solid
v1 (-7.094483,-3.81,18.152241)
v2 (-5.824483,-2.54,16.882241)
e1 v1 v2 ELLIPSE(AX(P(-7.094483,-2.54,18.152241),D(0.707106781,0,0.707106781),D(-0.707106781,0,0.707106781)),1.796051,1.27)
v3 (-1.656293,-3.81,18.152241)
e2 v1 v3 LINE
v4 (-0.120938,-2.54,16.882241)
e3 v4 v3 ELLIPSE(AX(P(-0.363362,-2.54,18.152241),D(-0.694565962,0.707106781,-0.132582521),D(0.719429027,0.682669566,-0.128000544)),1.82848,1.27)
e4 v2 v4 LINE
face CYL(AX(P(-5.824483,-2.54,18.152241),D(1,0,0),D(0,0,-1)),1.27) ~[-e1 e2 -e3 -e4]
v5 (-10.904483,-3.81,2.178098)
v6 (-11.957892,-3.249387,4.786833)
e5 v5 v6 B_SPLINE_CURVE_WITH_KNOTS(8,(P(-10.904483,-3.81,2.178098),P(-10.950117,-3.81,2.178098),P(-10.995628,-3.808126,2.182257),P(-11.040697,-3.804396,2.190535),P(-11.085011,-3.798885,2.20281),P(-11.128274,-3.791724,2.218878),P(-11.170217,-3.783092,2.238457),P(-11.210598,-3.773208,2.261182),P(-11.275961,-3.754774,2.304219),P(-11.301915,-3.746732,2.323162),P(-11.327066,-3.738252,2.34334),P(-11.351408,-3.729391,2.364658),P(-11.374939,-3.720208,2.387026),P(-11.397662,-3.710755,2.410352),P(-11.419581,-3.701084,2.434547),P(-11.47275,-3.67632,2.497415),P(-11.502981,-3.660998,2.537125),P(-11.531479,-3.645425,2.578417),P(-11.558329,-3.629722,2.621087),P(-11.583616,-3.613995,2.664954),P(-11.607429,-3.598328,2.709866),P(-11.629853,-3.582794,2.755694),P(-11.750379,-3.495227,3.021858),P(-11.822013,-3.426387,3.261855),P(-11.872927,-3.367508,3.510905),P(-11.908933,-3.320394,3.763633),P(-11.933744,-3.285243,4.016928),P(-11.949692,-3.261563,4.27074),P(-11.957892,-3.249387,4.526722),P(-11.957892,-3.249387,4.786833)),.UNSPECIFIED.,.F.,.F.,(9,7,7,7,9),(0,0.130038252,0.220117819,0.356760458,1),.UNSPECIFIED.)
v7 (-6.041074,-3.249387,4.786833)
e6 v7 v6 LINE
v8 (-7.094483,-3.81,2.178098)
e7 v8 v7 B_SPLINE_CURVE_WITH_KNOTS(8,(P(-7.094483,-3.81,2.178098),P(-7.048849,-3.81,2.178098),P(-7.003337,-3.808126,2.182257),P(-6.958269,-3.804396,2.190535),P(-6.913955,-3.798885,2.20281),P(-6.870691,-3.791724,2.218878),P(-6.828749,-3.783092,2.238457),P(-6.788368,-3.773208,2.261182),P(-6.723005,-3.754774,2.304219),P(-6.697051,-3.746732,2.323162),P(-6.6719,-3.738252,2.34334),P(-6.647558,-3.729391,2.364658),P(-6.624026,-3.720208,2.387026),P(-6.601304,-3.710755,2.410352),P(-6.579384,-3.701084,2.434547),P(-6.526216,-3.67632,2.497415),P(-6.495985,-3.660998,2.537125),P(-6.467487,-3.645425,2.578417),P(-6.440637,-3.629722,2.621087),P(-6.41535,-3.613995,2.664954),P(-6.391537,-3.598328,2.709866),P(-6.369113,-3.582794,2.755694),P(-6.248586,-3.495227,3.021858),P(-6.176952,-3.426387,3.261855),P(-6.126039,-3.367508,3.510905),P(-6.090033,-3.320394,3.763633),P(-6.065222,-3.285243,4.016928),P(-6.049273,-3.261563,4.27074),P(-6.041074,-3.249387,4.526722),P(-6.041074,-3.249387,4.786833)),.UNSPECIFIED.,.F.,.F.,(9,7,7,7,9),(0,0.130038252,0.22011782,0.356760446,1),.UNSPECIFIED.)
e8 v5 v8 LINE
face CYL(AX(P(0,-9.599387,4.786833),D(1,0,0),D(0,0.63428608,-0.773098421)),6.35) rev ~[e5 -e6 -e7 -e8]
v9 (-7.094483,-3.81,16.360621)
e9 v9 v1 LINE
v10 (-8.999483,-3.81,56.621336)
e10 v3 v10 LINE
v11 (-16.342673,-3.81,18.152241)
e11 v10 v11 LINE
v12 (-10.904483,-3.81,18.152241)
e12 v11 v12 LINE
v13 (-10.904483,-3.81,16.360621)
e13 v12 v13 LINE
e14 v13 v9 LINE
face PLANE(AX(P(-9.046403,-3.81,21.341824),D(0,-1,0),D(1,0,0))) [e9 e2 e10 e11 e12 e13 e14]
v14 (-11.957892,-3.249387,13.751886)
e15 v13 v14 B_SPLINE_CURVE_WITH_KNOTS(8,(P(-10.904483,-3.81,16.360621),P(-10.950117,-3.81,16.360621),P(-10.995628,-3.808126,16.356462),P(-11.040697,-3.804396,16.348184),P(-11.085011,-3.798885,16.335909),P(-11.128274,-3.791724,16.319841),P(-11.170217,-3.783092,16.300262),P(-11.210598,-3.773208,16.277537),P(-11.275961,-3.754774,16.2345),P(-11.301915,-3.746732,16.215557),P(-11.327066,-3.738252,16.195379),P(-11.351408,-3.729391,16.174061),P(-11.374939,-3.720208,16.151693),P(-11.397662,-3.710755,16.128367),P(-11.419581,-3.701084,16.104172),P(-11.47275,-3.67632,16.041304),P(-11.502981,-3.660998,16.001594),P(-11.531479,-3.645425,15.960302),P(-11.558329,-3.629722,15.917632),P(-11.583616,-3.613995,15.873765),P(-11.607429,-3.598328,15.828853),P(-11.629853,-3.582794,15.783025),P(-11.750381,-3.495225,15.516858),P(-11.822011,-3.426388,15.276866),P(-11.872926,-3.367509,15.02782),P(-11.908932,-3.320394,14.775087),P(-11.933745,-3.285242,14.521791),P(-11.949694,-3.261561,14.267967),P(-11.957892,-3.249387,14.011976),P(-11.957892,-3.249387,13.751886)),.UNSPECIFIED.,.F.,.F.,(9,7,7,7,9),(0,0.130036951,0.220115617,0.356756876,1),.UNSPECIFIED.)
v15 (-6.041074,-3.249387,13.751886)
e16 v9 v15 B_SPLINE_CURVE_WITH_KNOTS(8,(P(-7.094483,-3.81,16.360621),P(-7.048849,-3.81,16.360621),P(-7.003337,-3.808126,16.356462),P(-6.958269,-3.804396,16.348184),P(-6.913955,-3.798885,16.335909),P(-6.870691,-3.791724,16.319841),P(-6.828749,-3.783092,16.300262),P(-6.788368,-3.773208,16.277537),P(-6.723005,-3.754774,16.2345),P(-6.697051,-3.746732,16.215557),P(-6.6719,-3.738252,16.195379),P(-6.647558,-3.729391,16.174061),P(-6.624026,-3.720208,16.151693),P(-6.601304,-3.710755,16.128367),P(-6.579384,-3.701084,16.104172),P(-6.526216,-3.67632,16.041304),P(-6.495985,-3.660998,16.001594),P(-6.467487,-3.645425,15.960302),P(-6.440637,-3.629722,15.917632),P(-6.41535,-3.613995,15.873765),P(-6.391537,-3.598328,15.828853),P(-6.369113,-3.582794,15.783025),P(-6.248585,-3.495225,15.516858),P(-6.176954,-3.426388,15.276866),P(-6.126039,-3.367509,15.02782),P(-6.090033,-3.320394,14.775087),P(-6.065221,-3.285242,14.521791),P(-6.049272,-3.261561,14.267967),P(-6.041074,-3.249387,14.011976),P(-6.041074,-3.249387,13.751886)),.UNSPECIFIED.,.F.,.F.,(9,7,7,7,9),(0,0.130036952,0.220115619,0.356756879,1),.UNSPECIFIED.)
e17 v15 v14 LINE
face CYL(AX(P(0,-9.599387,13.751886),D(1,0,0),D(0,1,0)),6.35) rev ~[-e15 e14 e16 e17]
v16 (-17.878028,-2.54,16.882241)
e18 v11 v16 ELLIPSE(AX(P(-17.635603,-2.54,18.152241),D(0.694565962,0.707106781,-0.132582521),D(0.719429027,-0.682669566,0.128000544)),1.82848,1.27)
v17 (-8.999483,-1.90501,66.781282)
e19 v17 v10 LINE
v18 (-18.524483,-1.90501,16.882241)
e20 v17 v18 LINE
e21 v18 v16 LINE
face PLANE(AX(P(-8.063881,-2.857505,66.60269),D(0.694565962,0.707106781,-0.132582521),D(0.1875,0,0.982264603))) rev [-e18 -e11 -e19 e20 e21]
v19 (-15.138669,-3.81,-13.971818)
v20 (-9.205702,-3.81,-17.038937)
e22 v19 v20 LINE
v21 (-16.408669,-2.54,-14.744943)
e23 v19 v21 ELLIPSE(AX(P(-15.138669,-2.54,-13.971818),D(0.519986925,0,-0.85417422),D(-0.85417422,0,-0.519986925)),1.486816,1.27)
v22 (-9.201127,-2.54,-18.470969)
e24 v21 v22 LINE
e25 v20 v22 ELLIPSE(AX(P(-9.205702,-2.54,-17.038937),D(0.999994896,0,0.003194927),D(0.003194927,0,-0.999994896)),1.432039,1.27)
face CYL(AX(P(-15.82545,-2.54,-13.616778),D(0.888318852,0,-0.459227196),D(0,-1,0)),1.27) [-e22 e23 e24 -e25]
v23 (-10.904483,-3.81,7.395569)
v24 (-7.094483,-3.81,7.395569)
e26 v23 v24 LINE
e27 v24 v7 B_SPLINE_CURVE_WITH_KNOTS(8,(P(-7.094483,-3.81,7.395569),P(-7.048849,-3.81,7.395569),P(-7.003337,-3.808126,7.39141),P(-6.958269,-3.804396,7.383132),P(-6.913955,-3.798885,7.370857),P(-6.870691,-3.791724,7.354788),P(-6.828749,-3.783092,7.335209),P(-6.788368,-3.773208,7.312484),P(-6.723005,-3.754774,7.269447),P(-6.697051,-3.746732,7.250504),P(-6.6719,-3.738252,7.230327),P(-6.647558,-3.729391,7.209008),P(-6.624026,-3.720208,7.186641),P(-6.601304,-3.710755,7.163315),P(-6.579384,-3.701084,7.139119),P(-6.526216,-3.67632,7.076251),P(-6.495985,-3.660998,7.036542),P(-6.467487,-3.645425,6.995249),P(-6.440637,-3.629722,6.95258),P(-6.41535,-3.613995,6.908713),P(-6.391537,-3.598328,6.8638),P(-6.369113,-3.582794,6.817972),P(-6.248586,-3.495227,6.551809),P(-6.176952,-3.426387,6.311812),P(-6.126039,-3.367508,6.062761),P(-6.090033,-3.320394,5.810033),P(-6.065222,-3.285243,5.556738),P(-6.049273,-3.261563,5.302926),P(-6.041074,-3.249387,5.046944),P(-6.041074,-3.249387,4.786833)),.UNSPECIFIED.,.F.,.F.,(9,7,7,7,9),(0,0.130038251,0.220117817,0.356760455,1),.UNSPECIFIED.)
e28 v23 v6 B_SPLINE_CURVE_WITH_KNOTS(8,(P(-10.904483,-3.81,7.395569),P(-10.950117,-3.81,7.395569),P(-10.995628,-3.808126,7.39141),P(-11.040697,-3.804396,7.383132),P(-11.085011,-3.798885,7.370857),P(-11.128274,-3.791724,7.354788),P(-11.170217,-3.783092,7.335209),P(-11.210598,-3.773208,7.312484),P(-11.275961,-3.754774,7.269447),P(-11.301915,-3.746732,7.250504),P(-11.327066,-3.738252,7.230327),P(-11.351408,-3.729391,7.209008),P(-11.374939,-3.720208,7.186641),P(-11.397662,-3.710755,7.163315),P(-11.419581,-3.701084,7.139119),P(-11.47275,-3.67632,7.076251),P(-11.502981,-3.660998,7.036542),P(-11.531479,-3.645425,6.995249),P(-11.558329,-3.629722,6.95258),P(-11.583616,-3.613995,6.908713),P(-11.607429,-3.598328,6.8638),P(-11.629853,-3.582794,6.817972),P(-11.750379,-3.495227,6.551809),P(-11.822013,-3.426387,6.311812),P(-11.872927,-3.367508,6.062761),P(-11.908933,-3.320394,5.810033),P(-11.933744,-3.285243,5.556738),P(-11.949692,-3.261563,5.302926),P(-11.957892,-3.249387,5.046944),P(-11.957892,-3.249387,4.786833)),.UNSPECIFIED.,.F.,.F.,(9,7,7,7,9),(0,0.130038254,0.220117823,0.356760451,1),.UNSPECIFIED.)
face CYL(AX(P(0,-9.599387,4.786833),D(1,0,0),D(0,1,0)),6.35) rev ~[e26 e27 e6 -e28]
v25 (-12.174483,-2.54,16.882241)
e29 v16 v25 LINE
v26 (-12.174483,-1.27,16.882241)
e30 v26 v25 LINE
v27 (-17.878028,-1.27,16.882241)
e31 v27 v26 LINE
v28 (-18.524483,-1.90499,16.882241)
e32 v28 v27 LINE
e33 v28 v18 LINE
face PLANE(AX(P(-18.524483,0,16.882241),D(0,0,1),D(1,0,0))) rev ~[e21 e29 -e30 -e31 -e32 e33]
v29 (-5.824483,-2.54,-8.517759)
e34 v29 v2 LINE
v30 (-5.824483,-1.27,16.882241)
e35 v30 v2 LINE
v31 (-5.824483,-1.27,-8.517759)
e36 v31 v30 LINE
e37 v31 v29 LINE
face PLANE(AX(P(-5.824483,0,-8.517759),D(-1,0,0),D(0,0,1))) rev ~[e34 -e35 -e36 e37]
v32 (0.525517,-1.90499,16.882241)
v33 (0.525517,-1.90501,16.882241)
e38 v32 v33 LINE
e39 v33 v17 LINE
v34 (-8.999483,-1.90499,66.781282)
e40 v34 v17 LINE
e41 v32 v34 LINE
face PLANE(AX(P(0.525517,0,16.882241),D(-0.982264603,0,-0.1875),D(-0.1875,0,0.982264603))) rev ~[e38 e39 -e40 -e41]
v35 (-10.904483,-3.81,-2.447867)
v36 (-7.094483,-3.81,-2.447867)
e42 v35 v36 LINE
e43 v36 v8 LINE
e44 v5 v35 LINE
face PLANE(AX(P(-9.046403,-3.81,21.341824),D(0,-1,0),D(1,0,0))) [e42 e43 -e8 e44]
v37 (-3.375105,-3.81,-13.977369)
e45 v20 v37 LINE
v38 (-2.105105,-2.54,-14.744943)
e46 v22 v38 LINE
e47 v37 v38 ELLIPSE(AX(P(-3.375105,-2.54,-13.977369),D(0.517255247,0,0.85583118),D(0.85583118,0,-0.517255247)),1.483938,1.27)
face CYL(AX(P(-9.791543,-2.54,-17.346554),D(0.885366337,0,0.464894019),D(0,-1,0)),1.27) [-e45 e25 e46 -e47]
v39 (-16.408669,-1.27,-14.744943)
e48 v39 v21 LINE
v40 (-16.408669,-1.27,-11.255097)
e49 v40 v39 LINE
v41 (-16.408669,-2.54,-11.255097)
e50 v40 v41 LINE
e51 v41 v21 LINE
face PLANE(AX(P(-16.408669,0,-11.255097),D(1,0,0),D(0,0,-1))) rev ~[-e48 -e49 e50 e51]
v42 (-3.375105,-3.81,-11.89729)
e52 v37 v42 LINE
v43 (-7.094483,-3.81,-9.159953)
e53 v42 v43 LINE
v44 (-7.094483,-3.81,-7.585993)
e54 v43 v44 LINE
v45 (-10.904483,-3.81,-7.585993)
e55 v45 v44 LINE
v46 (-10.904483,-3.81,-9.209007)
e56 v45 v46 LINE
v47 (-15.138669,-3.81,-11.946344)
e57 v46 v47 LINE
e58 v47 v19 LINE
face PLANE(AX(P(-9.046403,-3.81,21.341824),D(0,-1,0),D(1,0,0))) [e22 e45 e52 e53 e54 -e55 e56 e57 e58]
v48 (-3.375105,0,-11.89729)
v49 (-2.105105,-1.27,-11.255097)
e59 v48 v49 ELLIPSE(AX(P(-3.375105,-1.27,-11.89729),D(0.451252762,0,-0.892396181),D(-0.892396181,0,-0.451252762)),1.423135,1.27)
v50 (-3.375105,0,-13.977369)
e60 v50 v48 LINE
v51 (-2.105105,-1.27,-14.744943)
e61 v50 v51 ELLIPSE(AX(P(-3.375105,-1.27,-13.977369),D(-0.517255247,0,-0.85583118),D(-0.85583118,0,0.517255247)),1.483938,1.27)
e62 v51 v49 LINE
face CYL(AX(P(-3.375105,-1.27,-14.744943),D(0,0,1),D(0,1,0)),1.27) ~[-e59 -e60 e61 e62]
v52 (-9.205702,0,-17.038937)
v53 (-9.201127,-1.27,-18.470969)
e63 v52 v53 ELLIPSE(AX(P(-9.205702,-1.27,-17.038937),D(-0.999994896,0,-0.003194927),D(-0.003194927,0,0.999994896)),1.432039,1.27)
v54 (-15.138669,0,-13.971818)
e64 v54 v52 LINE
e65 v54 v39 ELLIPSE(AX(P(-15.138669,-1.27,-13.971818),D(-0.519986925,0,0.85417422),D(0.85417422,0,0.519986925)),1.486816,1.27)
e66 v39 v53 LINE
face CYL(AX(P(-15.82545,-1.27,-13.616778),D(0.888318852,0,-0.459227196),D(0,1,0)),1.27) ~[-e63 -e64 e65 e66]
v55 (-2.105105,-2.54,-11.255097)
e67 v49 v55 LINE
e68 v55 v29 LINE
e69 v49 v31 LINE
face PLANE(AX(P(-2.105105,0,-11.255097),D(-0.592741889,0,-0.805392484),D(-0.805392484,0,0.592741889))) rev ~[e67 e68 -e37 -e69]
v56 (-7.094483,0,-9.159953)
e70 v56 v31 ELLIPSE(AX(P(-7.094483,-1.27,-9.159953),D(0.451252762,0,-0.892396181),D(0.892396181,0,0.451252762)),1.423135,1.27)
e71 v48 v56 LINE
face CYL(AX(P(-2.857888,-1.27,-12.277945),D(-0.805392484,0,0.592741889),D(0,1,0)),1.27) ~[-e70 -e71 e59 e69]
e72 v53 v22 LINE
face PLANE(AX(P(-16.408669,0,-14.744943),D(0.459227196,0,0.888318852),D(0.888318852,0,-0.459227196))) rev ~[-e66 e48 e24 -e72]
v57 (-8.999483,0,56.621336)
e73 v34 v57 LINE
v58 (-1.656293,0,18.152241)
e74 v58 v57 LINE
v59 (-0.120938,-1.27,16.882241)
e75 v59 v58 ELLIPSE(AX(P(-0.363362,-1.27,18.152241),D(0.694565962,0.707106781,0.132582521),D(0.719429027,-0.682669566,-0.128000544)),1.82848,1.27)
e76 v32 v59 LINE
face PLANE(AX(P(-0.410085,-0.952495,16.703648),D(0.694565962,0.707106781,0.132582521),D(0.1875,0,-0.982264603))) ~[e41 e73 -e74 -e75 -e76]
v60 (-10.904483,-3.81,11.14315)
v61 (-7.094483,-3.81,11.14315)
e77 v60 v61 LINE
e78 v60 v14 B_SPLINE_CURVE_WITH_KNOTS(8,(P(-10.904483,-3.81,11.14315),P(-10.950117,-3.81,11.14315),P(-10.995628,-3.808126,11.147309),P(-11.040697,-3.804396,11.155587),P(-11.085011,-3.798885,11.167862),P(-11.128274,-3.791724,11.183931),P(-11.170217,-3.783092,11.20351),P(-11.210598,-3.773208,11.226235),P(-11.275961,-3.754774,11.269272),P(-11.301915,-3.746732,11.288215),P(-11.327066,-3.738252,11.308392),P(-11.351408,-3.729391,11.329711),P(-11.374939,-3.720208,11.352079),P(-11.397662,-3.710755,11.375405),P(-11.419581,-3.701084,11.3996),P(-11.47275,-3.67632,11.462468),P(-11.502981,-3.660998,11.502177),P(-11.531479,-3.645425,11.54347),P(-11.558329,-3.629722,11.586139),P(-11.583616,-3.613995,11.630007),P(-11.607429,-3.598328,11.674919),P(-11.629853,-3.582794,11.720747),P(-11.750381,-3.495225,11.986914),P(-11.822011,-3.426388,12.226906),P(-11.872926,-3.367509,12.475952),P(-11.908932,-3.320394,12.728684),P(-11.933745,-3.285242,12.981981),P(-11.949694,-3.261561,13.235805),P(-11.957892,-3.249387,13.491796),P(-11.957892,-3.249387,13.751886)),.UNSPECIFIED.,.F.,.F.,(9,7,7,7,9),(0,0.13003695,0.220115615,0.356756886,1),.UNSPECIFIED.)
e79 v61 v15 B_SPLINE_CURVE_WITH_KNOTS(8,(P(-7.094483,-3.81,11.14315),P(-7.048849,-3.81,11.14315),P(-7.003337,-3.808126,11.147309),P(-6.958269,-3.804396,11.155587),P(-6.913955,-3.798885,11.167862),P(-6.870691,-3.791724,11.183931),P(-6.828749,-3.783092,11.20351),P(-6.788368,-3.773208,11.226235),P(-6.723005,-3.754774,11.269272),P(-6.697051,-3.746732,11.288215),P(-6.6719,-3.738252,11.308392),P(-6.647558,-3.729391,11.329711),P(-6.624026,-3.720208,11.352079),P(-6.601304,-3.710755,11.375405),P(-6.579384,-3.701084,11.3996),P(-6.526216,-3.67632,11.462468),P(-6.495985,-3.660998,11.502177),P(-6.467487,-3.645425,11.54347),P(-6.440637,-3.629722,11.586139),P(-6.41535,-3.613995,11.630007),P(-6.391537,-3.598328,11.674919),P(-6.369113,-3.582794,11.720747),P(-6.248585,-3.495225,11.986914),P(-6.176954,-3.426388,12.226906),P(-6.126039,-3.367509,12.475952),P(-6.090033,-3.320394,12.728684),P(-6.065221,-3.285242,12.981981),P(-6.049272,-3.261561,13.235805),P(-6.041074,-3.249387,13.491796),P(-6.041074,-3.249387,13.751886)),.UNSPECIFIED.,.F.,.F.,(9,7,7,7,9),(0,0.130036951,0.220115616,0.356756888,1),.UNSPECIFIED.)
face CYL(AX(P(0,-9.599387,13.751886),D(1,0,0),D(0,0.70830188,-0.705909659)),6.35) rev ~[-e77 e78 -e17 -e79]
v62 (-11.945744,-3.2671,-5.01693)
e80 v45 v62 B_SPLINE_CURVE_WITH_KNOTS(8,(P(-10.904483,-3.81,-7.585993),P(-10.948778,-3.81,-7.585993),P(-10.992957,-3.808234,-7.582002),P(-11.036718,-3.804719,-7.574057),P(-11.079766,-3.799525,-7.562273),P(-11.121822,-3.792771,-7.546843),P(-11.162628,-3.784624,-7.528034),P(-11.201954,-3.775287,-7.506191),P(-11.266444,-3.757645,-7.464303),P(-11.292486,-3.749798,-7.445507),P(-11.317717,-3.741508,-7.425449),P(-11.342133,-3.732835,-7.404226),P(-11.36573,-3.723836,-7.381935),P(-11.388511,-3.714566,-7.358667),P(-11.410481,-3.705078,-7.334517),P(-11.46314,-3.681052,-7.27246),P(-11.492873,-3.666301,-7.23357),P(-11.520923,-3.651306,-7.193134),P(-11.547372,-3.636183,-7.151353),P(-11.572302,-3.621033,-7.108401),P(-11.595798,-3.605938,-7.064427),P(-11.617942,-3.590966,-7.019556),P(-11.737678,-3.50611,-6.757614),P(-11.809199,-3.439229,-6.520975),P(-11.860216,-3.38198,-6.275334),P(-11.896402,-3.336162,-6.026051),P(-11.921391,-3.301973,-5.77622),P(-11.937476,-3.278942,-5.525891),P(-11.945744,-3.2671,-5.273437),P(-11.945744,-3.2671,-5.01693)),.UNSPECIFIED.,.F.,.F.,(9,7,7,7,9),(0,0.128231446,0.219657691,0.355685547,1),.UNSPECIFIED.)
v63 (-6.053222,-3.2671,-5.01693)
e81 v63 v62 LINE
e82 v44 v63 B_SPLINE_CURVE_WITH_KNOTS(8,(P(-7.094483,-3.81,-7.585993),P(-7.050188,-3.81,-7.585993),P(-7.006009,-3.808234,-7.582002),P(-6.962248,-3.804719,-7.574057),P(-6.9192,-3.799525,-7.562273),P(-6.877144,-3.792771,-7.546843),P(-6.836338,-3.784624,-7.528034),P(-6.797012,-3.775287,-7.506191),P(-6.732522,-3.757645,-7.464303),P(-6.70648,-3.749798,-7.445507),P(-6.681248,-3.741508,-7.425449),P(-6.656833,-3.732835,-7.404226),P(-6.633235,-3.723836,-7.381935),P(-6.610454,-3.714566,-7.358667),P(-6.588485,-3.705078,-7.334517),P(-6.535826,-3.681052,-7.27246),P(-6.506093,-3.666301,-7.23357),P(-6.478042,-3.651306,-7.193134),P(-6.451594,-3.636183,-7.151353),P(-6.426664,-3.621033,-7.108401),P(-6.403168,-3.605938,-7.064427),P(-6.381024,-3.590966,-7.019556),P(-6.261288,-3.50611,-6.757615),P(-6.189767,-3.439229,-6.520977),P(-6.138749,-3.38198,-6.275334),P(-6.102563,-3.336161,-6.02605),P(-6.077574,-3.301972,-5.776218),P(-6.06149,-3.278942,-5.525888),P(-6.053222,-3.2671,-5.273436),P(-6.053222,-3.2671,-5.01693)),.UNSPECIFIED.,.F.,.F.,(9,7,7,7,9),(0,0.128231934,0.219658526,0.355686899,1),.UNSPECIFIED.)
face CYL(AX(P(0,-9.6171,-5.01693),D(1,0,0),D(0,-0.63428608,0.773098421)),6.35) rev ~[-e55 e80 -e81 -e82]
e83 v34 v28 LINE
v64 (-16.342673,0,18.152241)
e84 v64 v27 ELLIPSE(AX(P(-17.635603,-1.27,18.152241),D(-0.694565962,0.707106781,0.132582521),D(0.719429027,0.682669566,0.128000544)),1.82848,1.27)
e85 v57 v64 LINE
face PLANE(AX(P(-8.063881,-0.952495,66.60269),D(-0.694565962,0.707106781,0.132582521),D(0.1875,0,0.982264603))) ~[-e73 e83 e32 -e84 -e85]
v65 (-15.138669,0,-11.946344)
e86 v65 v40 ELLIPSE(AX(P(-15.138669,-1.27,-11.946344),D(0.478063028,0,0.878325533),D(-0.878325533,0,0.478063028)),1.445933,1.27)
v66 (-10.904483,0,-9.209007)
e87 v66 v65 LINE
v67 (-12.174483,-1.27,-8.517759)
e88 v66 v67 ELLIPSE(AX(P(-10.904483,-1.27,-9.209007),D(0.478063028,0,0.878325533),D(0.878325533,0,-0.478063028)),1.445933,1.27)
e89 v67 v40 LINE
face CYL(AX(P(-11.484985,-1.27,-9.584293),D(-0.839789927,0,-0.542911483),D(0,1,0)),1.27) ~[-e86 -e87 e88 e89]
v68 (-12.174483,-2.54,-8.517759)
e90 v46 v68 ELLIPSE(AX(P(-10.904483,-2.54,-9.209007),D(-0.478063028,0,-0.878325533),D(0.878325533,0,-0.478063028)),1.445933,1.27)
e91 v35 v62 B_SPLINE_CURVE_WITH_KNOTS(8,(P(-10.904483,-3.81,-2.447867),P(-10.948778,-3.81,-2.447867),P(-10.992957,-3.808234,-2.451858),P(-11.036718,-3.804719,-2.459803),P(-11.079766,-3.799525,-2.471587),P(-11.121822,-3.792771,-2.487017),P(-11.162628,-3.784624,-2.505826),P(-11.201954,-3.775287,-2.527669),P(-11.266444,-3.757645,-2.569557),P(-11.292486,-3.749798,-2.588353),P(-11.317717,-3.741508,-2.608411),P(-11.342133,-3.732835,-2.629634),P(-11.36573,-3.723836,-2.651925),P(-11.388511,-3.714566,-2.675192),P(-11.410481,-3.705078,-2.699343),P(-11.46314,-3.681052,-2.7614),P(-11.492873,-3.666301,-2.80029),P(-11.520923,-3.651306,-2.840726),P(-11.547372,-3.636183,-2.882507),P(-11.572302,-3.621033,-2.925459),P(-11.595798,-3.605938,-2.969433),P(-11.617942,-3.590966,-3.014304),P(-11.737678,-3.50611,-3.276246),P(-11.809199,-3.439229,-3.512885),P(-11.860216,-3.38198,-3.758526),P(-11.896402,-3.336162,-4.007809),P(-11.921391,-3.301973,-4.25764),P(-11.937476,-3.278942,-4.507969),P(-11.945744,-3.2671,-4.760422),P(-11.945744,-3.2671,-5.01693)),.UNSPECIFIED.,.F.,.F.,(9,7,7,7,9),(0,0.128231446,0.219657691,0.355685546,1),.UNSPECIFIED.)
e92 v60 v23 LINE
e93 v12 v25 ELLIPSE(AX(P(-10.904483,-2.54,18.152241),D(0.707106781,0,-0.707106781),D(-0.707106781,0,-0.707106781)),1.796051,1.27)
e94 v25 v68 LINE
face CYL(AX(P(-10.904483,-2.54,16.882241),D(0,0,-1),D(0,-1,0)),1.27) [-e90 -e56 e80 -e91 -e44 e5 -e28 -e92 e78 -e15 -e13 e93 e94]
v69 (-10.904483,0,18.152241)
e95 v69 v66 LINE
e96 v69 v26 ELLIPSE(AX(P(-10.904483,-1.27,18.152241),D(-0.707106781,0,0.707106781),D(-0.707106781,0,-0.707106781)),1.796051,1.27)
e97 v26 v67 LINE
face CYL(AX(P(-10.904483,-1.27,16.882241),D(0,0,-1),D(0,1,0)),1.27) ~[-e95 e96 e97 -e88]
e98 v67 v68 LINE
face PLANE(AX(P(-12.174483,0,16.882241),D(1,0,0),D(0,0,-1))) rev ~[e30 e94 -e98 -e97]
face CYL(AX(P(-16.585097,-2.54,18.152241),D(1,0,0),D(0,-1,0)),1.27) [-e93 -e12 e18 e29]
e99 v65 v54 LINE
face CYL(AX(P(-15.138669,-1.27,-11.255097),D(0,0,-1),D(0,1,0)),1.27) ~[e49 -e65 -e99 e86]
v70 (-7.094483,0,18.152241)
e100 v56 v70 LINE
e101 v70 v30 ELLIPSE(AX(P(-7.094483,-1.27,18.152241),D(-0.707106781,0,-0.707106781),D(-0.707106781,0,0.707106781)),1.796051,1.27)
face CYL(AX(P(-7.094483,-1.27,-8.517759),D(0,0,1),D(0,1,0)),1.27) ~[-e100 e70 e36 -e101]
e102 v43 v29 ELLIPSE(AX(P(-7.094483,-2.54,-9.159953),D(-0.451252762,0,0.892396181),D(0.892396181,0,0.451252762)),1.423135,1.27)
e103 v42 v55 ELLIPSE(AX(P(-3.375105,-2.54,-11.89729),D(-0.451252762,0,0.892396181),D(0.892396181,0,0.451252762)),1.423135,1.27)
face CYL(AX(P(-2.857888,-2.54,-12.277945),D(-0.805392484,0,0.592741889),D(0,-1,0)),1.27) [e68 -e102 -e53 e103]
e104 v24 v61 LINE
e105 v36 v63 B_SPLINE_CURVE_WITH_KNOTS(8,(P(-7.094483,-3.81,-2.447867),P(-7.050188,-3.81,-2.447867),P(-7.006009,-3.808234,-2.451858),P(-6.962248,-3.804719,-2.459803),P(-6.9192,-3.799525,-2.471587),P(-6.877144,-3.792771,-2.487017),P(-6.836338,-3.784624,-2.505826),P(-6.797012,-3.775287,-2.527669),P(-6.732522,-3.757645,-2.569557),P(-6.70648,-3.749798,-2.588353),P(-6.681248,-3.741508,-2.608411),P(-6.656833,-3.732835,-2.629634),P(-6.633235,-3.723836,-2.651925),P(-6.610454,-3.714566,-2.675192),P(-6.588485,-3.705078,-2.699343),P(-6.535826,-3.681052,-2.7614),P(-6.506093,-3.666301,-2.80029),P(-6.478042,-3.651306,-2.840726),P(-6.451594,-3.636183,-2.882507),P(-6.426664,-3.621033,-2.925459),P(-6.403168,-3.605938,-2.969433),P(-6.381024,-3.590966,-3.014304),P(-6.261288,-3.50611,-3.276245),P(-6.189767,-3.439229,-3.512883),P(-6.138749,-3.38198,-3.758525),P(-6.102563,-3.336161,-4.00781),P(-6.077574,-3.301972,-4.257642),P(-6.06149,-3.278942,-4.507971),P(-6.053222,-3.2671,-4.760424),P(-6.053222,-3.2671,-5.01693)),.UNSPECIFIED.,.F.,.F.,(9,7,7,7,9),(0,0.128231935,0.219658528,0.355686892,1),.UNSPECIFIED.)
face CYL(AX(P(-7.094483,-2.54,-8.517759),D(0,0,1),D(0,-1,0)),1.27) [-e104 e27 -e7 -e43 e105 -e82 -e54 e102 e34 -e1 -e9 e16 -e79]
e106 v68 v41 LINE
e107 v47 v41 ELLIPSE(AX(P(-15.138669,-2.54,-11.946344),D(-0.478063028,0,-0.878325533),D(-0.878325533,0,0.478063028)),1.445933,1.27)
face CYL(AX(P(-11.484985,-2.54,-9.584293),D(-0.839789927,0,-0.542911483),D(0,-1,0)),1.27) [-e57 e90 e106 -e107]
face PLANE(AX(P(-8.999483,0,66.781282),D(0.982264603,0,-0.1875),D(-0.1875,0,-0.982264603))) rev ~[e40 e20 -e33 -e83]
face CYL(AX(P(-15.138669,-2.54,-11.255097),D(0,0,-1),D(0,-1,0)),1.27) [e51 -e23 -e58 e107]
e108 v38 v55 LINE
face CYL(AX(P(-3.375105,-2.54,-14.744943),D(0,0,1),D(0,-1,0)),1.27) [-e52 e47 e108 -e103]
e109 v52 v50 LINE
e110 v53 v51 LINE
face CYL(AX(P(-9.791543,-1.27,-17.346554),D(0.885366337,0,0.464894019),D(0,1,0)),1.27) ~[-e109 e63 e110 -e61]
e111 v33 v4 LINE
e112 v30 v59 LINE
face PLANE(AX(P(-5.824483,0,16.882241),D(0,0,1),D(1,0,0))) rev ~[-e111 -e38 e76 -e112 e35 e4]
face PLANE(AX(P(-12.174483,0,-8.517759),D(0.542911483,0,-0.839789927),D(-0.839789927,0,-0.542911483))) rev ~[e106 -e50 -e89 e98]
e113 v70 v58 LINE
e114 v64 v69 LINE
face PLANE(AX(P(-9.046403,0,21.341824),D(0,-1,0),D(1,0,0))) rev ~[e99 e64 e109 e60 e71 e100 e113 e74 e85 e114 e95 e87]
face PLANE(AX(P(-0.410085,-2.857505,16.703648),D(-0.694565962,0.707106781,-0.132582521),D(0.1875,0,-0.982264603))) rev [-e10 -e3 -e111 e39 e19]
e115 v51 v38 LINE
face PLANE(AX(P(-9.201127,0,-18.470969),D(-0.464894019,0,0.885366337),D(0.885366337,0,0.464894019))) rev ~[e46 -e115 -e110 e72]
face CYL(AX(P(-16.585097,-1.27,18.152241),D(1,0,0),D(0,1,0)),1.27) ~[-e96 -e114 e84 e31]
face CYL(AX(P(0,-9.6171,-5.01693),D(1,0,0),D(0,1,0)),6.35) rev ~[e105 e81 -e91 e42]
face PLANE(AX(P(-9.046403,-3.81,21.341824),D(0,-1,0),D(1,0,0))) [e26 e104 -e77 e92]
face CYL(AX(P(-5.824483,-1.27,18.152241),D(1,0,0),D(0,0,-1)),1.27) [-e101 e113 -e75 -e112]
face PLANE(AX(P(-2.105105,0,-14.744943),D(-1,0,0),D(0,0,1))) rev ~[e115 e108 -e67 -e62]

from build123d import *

# Parameters (mm, degrees)
F1_DEPTH = 3.81
F2_SIZE  = 1.90499
F3_R     = 1.27
F5_DEPTH = 25.4


# Not quite as in the source:
# - a fillet or chamfer is up to 0.001 mm smaller than in the source, because OpenCascade refuses the exact size
# - a feature names something its author has since deleted; it is built from what else it names


with BuildPart() as f1:
    # F0 (on Front) → F1 (new body)
    with BuildSketch(Plane.XZ):
        Polygon((-12.1744828463, 16.8822405368), (-12.1744828463, -8.5177594632), (-16.408668831, -11.2550966442), (-16.408668831, -14.7449430078), (-9.2011271045, -18.4709690511), (-2.1051054355, -14.7449430078), (-2.1051054355, -11.2550966442), (-5.8244828463, -8.5177594632), (-5.8244828463, 16.8822405368), (0.5255171537, 16.8822405368), (-8.9994828463, 66.7812823613), (-18.5244828463, 16.8822405368), align=None)
    extrude(amount=F1_DEPTH)

    # F2 (size 1.905 in the source; OpenCascade refuses exactly that, so slightly less here)
    f2_edges = [f1.edges().sort_by_distance(p)[0] for p in [
        (-13.761983, -3.81, 41.831761),
        (-4.236983, -3.81, 41.831761),
        (-13.761983, 0, 41.831761),
        (-4.236983, 0, 41.831761),
    ]]
    chamfer(f2_edges, length=F2_SIZE)

    # F3
    f3_edges = [f1.edges().sort_by_distance(p)[0] for p in [
        (-12.174483, -3.81, 4.182241),
        (-5.824483, -3.81, 4.182241),
        (-12.174483, 0, 4.182241),
        (-5.824483, 0, 4.182241),
        (-14.37979, -3.81, 16.882241),
        (-3.619176, 0, 16.882241),
        (-3.619176, -3.81, 16.882241),
        (-14.37979, 0, 16.882241),
        (-14.291576, -3.81, -9.886428),
        (-16.408669, -3.81, -13.00002),
        (-12.804898, -3.81, -16.607956),
        (-5.653116, -3.81, -16.607956),
        (-2.105105, -3.81, -13.00002),
        (-3.964794, -3.81, -9.886428),
        (-14.291576, 0, -9.886428),
        (-3.964794, 0, -9.886428),
        (-2.105105, 0, -13.00002),
        (-5.653116, 0, -16.607956),
        (-12.804898, 0, -16.607956),
        (-16.408669, 0, -13.00002),
    ]]
    fillet(f3_edges, radius=F3_R)

    # F4 (on Right) → F5 (cut)
    with BuildSketch(Plane.YZ):
        with BuildLine():
            ThreePointArc((-5.1016697734, 9.2693595216), (-3.730698506, 11.3268088009), (-3.2493867144, 13.7518858537))
            ThreePointArc((-3.2493867144, 13.7518858537), (-12.0244637672, 19.6205740621), (-14.0971036554, 9.2693595216))
            ThreePointArc((-14.0971036554, 9.2693595216), (-9.5993867144, 11.1368331894), (-5.1016697734, 9.2693595216))
        make_face()
        with BuildLine():
            ThreePointArc((-5.1016697734, 9.2693595216), (-9.5993867144, 11.1368331894), (-14.0971036554, 9.2693595216))
            ThreePointArc((-14.0971036554, 9.2693595216), (-9.5993867144, 7.4018858537), (-5.1016697734, 9.2693595216))
        make_face()
        with BuildLine():
            ThreePointArc((-5.1016697734, 9.2693595216), (-9.5993867144, 7.4018858537), (-14.0971036554, 9.2693595216))
            ThreePointArc((-14.0971036554, 9.2693595216), (-15.9420131796, 4.4809091421), (-13.6448170782, -0.107754962))
            ThreePointArc((-13.6448170782, -0.107754962), (-9.6056271037, 1.3330596991), (-5.571670106, -0.1223417843))
            ThreePointArc((-5.571670106, -0.1223417843), (-3.8592429678, 2.0714603295), (-3.2493867144, 4.7868331894))
            ThreePointArc((-3.2493867144, 4.7868331894), (-3.730698506, 7.2119102423), (-5.1016697734, 9.2693595216))
        make_face()
        with BuildLine():
            ThreePointArc((-5.571670106, -0.1223417843), (-9.6108600804, -1.5631564454), (-13.6448170782, -0.107754962))
            ThreePointArc((-13.6448170782, -0.107754962), (-12.3324733297, -10.7570736823), (-3.2671004698, -5.0169299357))
            ThreePointArc((-3.2671004698, -5.0169299357), (-3.8720598777, -2.311932968), (-5.571670106, -0.1223417843))
        make_face()
        with BuildLine():
            ThreePointArc((-5.571670106, -0.1223417843), (-9.6056271037, 1.3330596991), (-13.6448170782, -0.107754962))
            ThreePointArc((-13.6448170782, -0.107754962), (-9.6108600804, -1.5631564454), (-5.571670106, -0.1223417843))
        make_face()
    extrude(amount=-F5_DEPTH, mode=Mode.SUBTRACT)


solid = f1.part
